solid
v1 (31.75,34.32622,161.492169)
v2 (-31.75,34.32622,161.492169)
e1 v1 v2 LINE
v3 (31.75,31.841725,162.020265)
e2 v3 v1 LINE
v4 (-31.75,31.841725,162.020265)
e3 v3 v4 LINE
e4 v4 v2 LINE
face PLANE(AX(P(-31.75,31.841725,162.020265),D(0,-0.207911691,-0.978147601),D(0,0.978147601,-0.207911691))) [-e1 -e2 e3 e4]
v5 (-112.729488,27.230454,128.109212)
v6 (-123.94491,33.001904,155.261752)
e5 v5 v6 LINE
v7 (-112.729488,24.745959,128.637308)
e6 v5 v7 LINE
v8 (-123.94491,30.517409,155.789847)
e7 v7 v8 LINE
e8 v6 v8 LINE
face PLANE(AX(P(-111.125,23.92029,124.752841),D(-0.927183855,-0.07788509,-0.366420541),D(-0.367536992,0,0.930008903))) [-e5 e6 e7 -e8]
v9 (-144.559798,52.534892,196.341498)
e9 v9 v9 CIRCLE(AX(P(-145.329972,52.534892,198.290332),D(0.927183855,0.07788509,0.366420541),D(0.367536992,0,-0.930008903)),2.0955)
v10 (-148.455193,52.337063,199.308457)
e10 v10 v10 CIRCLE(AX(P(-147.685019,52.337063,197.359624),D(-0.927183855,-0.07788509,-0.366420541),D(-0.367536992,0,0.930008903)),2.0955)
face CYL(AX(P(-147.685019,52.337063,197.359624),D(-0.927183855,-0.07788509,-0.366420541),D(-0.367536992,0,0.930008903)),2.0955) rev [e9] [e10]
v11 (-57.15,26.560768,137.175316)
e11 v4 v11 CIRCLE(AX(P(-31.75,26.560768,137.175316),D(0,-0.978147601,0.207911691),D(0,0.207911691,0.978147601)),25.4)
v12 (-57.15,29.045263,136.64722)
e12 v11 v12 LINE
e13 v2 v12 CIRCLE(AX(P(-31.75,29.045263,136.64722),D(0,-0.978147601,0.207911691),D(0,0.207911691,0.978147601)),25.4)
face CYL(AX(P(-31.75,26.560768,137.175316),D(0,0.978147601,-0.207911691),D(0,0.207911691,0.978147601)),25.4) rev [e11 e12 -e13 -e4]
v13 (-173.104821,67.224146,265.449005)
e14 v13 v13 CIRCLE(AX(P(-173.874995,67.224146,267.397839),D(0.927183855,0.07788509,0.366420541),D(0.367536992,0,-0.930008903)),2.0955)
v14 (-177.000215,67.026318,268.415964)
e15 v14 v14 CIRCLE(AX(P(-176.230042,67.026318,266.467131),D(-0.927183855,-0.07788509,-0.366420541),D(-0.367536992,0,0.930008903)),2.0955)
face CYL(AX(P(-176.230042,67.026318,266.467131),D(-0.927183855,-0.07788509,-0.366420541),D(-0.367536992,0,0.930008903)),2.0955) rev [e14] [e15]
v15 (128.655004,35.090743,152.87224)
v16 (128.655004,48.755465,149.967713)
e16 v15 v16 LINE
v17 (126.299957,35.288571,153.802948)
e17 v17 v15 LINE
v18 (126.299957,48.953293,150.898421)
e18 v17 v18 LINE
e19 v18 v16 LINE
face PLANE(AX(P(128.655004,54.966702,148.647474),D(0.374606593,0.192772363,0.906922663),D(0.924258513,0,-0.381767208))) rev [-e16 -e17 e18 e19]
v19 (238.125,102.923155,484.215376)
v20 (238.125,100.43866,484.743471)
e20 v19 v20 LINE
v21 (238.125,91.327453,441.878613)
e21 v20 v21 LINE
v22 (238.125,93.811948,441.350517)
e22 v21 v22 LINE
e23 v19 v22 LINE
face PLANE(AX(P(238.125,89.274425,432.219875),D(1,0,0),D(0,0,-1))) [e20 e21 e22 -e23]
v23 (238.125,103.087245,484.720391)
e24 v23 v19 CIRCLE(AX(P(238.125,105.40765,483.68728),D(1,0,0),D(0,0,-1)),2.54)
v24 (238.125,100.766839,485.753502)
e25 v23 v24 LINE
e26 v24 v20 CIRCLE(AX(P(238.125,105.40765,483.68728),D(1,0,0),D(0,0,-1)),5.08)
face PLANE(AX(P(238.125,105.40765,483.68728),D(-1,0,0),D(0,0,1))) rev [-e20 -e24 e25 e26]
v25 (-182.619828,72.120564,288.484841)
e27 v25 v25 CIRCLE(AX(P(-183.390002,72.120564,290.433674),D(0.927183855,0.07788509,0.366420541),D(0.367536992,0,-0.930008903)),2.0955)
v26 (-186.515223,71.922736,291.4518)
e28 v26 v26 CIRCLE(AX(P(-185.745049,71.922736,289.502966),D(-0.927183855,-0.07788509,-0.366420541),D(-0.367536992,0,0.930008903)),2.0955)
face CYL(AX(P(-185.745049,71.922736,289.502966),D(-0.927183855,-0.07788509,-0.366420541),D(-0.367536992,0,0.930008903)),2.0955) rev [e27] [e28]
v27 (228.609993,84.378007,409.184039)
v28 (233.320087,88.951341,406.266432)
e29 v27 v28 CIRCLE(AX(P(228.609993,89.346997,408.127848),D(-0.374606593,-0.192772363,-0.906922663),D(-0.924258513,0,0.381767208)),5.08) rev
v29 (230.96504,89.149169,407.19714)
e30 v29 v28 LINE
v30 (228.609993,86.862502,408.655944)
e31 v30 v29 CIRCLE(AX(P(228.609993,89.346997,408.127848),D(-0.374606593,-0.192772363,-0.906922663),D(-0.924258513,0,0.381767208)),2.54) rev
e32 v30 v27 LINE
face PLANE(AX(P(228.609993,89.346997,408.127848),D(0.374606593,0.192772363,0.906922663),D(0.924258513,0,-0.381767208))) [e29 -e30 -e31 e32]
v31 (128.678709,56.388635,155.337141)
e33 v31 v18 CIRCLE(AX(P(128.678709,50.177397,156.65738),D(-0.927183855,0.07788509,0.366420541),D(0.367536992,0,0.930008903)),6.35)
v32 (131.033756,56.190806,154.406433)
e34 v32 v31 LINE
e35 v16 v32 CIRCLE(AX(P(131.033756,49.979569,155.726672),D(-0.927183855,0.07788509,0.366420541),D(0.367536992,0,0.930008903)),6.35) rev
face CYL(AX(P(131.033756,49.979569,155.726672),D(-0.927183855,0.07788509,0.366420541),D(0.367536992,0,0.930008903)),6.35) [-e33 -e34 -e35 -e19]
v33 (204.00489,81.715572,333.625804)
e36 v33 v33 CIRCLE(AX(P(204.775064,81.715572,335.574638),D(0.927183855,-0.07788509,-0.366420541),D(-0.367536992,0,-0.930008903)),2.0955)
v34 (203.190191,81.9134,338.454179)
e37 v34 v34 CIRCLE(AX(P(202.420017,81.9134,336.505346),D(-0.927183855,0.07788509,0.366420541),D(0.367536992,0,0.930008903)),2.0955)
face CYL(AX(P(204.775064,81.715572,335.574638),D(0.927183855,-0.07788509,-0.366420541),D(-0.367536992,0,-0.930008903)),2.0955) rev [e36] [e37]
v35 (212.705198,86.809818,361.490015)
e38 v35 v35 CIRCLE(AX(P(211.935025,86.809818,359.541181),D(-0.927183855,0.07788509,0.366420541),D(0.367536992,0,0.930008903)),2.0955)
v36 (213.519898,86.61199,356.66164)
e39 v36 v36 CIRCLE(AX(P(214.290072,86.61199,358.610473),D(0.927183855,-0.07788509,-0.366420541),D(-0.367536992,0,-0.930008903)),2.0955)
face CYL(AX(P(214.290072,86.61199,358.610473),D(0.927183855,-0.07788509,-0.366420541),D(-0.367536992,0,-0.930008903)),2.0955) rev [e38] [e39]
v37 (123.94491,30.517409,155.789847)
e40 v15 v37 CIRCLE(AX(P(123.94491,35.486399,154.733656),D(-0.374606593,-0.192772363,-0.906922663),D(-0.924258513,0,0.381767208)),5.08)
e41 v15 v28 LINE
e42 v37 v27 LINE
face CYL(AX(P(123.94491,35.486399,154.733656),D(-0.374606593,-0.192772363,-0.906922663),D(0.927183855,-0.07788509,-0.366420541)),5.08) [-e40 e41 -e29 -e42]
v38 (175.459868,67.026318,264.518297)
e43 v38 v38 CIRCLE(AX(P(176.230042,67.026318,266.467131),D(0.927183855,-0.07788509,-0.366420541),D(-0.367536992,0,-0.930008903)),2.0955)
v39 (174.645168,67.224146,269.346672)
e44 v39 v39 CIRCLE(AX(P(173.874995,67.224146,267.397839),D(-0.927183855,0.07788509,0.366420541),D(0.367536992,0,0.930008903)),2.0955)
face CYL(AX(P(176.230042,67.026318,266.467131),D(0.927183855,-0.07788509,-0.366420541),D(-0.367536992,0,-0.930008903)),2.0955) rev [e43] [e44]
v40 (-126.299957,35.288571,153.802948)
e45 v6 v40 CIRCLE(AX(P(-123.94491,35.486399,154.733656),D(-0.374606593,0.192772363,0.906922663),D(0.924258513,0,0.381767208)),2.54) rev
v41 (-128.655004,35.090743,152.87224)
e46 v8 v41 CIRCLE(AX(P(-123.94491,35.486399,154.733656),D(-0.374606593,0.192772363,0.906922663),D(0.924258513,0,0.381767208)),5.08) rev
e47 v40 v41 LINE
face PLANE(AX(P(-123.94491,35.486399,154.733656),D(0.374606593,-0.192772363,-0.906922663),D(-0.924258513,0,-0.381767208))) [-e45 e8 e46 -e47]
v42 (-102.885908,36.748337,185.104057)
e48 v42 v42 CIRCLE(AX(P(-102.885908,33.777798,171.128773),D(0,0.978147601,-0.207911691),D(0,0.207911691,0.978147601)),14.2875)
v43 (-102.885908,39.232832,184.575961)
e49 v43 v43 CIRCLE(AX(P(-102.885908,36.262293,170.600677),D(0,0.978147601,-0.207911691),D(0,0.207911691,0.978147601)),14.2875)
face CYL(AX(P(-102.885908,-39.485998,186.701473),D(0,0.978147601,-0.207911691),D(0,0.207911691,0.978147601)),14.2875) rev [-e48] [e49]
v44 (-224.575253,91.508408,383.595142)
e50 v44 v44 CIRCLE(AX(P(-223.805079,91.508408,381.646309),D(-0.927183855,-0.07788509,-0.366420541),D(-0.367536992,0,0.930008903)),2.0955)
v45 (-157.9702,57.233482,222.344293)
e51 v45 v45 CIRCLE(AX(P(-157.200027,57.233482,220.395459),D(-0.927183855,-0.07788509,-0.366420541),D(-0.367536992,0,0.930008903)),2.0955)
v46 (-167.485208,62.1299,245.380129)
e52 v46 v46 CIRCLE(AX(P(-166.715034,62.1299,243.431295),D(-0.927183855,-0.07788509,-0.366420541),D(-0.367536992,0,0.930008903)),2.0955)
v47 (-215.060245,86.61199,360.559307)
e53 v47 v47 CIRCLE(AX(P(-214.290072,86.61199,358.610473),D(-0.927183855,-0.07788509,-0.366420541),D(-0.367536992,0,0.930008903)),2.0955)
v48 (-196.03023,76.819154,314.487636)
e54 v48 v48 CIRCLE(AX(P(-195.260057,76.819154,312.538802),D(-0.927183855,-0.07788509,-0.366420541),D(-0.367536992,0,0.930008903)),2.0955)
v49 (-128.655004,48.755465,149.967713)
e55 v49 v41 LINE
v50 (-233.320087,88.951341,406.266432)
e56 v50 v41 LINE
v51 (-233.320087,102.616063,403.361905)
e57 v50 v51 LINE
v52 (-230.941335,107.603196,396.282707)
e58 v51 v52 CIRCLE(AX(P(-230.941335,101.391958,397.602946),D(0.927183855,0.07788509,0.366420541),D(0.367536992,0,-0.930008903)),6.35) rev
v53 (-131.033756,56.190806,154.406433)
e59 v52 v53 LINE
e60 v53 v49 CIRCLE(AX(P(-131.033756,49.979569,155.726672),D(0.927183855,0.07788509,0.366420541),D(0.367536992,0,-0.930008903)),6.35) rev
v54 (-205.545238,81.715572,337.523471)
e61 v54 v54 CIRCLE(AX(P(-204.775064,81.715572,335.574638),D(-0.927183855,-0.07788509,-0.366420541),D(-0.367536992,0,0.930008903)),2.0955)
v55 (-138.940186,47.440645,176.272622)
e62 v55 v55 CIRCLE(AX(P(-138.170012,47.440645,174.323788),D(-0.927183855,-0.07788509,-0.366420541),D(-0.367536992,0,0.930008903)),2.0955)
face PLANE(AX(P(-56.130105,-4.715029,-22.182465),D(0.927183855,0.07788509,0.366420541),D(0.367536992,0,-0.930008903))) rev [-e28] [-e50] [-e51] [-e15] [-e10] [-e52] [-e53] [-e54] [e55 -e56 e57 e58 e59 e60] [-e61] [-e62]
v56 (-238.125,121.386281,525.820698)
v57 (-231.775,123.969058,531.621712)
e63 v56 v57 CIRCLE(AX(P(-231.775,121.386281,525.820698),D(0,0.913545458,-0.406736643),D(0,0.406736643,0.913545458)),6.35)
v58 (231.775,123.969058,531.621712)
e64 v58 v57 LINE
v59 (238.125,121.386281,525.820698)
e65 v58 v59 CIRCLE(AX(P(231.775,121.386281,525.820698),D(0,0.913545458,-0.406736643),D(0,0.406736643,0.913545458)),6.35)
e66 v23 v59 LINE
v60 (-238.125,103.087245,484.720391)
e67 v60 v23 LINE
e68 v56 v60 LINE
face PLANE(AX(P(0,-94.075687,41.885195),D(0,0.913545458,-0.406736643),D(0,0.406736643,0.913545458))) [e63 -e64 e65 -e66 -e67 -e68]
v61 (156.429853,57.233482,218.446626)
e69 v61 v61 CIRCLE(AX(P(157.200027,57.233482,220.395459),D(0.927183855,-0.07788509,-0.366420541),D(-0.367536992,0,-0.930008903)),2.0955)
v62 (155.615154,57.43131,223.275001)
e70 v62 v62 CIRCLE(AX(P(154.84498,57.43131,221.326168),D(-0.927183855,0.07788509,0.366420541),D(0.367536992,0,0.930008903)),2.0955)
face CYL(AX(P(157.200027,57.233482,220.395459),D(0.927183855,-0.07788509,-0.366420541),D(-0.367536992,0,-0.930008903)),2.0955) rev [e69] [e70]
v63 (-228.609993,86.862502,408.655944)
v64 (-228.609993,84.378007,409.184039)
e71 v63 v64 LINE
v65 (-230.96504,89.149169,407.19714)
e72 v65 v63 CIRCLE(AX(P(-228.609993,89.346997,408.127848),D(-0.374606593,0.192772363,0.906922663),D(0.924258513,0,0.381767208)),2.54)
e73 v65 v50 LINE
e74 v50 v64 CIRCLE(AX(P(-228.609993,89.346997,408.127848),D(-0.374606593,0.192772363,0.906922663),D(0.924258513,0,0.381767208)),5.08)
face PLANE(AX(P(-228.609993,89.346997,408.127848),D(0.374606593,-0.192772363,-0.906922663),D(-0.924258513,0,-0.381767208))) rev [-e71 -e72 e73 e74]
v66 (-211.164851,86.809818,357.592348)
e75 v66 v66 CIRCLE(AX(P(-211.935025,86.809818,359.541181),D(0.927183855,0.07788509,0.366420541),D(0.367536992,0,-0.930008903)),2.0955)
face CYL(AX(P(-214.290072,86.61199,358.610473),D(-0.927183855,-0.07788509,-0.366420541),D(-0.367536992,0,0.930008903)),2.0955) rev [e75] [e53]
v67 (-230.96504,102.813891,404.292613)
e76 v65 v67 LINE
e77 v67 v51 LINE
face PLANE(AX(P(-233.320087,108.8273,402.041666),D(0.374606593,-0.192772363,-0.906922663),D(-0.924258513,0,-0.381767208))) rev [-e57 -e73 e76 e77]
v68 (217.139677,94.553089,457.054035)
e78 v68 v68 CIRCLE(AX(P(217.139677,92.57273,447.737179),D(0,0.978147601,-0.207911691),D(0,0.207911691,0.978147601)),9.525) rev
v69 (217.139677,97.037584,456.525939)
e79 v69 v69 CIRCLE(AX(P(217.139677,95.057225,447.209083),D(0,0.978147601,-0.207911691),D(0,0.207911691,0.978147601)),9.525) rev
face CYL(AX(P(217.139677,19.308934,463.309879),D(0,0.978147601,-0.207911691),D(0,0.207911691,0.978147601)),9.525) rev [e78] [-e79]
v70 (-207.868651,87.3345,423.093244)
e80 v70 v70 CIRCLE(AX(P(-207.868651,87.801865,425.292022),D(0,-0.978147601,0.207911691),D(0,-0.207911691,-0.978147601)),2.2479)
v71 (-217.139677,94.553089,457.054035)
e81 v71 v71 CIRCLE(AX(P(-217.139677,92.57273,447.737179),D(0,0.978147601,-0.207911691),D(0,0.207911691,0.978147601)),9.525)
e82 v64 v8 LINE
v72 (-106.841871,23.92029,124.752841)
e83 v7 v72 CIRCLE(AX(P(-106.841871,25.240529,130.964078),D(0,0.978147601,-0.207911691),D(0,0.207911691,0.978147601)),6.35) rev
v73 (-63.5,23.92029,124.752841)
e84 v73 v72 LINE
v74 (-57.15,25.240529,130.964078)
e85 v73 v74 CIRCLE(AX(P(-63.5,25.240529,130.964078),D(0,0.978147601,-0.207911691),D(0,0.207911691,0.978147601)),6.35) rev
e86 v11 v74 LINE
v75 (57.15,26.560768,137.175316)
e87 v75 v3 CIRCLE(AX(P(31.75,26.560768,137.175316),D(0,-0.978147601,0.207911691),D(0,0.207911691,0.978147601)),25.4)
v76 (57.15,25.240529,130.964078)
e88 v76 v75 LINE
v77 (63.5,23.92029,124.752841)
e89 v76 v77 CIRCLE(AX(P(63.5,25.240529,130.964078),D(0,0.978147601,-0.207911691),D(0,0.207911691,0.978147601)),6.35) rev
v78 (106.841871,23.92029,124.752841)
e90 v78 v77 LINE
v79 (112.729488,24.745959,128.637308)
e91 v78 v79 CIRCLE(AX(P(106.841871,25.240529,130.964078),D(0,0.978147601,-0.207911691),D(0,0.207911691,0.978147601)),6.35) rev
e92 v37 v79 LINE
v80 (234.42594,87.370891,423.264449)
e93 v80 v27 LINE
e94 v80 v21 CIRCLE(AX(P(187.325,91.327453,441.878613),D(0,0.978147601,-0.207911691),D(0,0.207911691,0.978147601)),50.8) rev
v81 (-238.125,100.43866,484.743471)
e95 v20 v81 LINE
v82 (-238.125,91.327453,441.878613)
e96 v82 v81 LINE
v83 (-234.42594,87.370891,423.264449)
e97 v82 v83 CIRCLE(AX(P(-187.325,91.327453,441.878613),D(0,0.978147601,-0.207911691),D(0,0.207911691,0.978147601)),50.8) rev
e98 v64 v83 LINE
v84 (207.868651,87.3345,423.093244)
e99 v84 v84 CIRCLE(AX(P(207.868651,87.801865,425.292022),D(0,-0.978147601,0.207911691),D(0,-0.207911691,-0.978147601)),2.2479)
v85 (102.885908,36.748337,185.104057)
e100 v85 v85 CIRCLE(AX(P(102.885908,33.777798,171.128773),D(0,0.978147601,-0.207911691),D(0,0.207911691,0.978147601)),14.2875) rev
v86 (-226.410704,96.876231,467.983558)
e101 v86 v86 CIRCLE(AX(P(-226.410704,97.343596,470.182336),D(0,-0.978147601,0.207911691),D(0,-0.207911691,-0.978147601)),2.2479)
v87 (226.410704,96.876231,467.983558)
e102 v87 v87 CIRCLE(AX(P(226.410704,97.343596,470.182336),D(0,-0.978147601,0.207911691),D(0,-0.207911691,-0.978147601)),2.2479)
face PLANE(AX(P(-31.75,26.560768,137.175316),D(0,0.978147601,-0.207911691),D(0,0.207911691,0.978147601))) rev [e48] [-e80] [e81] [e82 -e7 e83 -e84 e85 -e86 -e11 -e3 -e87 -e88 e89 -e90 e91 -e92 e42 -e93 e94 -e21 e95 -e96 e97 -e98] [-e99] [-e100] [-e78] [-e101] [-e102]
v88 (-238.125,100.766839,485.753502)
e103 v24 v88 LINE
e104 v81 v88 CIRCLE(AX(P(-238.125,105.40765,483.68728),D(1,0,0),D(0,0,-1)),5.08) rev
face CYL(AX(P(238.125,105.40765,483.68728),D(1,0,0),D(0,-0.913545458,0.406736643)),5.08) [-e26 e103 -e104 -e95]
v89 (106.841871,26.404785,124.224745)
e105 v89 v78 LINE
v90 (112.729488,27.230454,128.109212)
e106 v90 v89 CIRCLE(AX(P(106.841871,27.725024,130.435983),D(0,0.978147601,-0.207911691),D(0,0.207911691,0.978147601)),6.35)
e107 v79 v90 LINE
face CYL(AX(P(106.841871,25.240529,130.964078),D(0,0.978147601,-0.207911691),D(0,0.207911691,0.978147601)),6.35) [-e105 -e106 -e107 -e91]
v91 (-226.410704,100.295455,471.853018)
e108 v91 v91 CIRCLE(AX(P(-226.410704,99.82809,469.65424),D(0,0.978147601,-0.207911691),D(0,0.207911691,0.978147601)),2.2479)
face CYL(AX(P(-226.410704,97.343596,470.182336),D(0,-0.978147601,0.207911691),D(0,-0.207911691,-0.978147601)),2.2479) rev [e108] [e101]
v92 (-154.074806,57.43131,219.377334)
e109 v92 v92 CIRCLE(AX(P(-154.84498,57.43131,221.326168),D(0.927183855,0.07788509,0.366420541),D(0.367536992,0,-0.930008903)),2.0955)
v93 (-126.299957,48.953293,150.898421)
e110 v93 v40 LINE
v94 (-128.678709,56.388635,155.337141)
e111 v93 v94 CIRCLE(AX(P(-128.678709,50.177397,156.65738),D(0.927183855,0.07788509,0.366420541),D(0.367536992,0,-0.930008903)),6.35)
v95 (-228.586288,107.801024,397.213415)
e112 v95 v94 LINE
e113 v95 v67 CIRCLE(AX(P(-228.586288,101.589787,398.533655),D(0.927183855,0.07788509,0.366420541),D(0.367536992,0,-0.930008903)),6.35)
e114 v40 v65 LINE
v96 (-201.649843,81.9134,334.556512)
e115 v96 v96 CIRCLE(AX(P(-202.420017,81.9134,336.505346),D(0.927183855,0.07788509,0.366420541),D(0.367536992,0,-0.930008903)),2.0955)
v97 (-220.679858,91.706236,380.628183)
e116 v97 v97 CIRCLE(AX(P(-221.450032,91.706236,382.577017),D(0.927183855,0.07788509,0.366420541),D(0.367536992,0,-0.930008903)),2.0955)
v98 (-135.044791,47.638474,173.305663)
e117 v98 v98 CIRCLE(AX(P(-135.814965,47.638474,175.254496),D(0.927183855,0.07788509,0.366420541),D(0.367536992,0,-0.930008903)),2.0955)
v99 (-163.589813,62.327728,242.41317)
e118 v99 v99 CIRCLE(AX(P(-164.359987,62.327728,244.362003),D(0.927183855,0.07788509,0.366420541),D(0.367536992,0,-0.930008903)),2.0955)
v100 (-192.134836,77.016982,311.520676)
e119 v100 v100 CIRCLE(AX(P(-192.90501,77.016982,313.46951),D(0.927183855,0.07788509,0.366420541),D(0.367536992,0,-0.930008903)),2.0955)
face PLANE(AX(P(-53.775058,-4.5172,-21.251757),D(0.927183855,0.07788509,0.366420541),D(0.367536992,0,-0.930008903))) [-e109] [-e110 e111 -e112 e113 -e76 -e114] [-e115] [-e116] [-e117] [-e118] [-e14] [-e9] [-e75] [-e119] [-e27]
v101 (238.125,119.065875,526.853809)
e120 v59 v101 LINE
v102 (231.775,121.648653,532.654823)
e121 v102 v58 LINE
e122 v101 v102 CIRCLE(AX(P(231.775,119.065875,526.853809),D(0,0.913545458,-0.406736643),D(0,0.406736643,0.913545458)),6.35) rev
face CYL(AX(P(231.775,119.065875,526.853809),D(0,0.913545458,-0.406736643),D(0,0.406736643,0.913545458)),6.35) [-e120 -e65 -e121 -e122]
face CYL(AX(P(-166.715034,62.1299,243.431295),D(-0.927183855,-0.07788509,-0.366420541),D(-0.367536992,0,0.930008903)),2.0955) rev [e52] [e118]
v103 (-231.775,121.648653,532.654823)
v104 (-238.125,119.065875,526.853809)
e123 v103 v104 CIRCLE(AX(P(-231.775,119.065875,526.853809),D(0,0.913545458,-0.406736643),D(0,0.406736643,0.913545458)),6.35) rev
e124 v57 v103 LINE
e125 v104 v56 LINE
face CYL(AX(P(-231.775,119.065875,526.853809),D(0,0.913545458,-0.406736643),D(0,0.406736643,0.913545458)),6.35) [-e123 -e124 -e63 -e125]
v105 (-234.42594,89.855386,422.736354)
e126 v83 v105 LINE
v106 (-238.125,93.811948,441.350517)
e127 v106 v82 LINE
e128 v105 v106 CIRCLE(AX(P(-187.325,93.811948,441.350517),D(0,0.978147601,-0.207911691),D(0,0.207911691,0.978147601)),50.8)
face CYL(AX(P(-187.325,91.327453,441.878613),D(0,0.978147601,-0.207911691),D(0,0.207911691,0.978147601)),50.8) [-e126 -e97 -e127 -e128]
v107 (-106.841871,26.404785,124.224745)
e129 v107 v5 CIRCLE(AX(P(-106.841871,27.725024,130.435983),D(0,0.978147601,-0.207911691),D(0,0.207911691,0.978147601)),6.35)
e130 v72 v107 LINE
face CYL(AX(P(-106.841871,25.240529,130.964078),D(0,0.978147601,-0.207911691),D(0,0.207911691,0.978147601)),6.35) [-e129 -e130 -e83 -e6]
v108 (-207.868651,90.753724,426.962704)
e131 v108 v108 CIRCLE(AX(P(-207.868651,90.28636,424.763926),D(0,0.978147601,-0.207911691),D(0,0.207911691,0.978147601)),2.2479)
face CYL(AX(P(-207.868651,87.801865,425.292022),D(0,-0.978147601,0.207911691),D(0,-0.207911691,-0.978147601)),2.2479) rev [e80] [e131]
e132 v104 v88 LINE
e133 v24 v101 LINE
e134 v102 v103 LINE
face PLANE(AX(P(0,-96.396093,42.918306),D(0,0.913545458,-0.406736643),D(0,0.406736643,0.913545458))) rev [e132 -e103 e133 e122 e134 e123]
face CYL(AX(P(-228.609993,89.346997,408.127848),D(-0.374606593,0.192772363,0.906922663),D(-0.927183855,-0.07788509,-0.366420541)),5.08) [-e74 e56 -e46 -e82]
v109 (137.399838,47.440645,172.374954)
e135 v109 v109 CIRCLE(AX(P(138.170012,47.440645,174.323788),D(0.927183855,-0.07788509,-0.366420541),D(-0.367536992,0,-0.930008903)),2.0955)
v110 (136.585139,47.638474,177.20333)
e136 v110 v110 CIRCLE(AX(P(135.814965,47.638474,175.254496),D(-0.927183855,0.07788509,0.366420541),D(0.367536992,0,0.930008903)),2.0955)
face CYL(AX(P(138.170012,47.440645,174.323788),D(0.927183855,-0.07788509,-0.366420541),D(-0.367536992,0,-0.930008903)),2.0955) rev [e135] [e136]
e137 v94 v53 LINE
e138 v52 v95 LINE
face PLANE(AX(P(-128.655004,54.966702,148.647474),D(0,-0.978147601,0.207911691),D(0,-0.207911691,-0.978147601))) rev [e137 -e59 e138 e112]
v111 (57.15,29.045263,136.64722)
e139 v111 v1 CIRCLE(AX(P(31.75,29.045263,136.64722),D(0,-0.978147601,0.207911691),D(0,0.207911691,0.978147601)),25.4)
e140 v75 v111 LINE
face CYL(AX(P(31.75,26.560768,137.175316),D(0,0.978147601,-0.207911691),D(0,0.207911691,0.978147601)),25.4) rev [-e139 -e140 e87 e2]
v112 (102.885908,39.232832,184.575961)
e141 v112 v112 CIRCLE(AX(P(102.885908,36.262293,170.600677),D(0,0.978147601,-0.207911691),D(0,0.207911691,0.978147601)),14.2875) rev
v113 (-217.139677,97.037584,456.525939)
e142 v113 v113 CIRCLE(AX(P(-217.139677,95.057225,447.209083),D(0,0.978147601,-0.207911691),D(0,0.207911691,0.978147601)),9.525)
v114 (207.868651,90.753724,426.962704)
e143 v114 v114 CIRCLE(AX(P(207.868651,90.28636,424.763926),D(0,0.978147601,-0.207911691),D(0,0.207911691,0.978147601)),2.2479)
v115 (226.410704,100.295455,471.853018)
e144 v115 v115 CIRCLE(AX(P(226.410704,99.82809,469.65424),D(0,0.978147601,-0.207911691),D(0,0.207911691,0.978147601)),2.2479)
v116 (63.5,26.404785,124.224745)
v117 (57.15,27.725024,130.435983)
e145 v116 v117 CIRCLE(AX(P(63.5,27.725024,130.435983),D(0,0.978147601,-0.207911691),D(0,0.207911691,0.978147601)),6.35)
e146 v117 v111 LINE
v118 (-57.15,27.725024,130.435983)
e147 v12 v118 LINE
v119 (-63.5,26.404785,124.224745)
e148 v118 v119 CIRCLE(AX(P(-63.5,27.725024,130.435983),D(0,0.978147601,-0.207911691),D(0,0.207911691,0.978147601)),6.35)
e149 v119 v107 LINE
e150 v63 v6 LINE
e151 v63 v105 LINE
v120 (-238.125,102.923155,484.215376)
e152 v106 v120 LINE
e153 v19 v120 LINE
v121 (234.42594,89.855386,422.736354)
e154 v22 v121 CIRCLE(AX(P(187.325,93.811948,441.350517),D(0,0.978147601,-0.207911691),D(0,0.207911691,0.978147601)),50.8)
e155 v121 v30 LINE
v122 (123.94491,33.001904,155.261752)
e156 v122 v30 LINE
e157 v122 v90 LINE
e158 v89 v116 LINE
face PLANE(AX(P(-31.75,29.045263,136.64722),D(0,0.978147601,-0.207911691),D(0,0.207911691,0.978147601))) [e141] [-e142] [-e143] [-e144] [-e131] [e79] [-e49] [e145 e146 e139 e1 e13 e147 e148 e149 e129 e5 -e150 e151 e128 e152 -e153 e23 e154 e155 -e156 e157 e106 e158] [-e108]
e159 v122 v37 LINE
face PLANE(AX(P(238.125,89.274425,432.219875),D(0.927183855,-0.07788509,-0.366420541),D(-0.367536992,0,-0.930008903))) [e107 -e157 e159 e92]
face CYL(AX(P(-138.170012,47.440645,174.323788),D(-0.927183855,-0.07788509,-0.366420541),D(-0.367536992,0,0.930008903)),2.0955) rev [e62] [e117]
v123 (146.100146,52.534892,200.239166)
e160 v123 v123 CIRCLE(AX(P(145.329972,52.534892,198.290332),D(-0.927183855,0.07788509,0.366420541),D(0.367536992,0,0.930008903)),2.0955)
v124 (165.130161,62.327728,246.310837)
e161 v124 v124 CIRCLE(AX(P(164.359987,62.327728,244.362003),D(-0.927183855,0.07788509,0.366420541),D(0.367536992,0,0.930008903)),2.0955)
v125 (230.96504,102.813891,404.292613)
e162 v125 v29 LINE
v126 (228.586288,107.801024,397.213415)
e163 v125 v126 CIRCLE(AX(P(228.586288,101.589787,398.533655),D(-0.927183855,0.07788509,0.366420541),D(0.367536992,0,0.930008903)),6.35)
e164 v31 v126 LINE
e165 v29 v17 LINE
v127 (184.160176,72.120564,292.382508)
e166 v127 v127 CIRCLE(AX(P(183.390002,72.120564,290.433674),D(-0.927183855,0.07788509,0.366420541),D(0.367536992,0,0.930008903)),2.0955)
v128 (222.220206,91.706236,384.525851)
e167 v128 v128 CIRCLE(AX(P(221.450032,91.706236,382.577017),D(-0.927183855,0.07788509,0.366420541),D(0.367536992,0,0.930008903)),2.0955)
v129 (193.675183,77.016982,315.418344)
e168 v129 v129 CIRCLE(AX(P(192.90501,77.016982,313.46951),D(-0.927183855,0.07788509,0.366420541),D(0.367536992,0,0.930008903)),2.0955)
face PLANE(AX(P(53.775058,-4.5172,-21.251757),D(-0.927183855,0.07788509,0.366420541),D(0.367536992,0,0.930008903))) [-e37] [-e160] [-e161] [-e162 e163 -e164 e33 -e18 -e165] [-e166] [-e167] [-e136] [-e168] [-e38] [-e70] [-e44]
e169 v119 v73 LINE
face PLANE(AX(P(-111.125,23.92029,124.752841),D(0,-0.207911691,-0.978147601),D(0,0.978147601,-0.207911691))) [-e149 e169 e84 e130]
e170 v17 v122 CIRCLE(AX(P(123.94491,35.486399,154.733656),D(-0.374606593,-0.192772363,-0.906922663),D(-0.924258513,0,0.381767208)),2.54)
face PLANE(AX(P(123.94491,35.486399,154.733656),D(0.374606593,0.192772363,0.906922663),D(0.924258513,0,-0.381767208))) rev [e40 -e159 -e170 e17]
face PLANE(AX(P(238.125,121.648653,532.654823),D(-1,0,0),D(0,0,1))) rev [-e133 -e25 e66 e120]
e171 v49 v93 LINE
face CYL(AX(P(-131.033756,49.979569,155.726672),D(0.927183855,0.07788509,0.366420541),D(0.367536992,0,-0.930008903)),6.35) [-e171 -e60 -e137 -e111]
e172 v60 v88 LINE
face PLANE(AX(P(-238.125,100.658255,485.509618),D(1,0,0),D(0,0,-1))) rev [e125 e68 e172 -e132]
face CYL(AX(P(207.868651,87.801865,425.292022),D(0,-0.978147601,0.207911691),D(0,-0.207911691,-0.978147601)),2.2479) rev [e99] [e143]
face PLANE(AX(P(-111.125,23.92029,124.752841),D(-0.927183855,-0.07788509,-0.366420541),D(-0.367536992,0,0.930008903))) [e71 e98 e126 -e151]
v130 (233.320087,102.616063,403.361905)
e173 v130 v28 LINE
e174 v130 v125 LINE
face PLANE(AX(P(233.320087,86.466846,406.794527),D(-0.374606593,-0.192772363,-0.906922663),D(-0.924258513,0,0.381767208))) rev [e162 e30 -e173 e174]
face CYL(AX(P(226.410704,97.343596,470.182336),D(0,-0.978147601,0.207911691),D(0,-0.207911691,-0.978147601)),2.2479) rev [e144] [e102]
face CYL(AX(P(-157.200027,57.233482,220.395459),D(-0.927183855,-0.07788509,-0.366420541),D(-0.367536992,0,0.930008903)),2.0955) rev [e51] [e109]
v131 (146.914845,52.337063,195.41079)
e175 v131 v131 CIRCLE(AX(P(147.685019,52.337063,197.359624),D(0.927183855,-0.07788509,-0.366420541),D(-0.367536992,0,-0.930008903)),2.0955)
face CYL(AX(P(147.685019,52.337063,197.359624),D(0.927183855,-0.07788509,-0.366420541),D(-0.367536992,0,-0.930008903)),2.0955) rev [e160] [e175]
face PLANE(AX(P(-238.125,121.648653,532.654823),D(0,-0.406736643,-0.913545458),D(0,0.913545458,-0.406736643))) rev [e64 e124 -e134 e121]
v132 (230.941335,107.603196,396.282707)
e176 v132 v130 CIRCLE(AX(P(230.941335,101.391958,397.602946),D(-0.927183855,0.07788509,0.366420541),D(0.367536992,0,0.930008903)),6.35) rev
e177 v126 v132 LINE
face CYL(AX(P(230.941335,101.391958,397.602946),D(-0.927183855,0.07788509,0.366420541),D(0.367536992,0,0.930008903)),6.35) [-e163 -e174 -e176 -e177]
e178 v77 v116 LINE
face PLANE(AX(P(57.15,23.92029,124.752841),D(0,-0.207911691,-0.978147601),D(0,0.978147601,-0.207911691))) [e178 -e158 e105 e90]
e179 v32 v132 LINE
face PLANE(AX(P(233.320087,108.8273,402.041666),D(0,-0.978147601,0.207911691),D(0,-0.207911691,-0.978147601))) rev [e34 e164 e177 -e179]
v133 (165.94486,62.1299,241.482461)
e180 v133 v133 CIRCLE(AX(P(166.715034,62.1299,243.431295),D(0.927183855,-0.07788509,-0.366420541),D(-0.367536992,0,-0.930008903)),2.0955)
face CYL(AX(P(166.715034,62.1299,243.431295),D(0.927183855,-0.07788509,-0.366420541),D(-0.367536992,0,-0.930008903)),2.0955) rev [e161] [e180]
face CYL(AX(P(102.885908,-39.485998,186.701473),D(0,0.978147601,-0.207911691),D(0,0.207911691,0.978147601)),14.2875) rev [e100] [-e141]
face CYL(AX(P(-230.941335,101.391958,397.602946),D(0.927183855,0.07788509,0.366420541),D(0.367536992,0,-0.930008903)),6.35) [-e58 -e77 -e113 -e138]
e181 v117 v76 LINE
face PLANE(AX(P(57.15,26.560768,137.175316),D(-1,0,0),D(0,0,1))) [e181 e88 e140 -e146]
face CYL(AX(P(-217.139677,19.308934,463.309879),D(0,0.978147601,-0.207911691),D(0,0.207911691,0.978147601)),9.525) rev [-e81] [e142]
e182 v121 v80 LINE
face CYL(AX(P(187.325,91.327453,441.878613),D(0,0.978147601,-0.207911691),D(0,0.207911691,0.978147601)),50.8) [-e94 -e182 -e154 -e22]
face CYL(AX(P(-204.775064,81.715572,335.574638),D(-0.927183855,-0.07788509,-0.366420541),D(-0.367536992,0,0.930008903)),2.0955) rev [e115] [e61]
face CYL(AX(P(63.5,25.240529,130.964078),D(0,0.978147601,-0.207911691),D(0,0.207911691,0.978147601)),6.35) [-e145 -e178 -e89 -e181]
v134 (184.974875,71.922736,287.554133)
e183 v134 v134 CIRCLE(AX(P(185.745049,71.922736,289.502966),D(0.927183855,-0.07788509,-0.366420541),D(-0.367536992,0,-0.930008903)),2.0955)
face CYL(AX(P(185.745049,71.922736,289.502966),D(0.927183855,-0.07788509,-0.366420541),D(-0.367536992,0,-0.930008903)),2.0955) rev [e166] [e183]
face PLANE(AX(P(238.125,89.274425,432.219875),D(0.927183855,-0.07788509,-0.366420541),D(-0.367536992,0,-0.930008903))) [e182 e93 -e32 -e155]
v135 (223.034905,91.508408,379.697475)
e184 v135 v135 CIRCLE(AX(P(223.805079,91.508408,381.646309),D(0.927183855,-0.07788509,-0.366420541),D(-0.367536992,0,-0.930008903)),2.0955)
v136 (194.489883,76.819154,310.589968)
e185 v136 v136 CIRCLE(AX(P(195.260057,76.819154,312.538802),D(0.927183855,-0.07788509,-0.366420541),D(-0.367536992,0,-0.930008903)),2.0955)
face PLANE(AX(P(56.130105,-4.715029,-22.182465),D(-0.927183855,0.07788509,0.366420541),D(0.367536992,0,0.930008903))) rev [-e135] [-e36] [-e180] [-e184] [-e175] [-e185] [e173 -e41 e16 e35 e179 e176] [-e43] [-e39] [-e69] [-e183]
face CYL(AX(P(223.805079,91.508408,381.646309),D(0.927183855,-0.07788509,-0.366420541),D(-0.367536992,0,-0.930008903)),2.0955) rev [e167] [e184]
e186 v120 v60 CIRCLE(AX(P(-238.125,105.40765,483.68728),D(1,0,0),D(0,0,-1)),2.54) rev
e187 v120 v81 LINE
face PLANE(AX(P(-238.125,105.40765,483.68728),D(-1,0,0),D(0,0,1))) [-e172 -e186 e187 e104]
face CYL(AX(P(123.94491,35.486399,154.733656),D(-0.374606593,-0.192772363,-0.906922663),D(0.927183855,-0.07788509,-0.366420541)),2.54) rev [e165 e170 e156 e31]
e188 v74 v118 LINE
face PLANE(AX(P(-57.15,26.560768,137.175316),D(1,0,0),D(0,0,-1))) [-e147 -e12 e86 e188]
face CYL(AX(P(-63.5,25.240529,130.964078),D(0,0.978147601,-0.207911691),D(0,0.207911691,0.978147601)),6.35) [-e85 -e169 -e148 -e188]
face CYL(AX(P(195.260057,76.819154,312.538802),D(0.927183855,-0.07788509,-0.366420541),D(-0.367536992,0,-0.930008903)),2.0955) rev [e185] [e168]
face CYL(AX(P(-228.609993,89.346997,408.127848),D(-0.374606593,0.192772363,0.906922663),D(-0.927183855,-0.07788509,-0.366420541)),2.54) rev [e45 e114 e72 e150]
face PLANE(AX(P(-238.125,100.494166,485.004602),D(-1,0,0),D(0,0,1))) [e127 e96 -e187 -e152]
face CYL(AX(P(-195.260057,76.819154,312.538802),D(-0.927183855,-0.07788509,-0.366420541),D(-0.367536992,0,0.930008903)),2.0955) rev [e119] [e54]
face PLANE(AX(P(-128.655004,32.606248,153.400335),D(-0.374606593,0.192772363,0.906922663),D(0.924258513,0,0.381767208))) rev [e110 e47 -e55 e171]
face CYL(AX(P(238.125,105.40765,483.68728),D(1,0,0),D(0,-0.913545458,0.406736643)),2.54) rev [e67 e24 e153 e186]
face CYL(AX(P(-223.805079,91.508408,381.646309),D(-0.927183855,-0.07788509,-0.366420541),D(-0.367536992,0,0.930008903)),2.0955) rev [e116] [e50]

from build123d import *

# Parameters (mm, degrees)
BASE_FLANGE1_DEPTH               = 2.54
EDGE_FLANGE1_DEPTH               = 279.4
EDGE_FLANGE1_BEND_DEPTH          = 279.4
SKETCH12_R                       = 9.525
SKETCH12_R_2                     = 14.2875
CUT_EXTRUDE2_DEPTH               = 552.198202569
EDGE_FLANGE3_STRIP_CUT_DEPTH     = 476.25
EDGE_FLANGE3_DEPTH               = 476.25
F_1_4_0_25_DIAMETER_HOLE1_REACH  = 643.085
F_1_4_0_25_DIAMETER_HOLE1_BORE_R = 2.0955
F_8_CLEARANCE_HOLE1_D            = 4.4958
FILLET1_R                        = 50.8
FILLET2_R                        = 6.35


# Sheet-metal steps are written as plain solids
with BuildPart() as part:
    # Sketch19 → Base-Flange1 (new body)
    with BuildSketch(Plane(origin=(0, 0, 0), x_dir=(1, 0, 0), z_dir=(0, 0.9781476007338071, -0.20791169081775282))):
        with BuildLine():
            Line((238.125, -441.336030384), (111.125, -127))
            Line((111.125, -127), (57.15, -127))
            Line((57.15, -127), (57.15, -139.7))
            ThreePointArc((57.15, -139.7), (49.710512242, -157.660512242), (31.75, -165.1))
            Line((31.75, -165.1), (-31.75, -165.1))
            ThreePointArc((-31.75, -165.1), (-49.710512242, -157.660512242), (-57.15, -139.7))
            Line((-57.15, -139.7), (-57.15, -127))
            Line((-57.15, -127), (-111.125, -127))
            Line((-111.125, -127), (-238.125, -441.336030384))
            Line((-238.125, -441.336030384), (-238.125, -495.3))
            Line((-238.125, -495.3), (238.125, -495.3))
            Line((238.125, -495.3), (238.125, -441.336030384))
        make_face()
    extrude(amount=-BASE_FLANGE1_DEPTH)

    # Edge-Flange1 section (across the edge) → Edge-Flange1 (add)
    with BuildSketch(Plane(origin=(-126.299957317, 32.804075954, 154.331043448), x_dir=(0.9271838545667858, 0.07788509022858499, 0.36642054056884243), z_dir=(-0.3746065934159162, 0.19277236290190183, 0.9069226627836245))):
        with BuildLine():
            Line((-2.54, 2.54), (-2.54, 22.86))
            Line((-2.54, 22.86), (0, 22.86))
            Line((0, 22.86), (0, 2.54))
            ThreePointArc((0, 2.54), (0.743948776, 0.743948776), (2.54, 0))
            Line((2.54, 0), (2.54, -2.54))
            ThreePointArc((2.54, -2.54), (-1.052102448, -1.052102448), (-2.54, 2.54))
        make_face()
    extrude(amount=EDGE_FLANGE1_DEPTH)

    # Edge-Flange1 section 2 (across the edge) → Edge-Flange1 bend (add)
    with BuildSketch(Plane(origin=(230.965039518, 86.664674149, 407.72523543), x_dir=(-0.9271838545667858, 0.07788509022858499, 0.36642054056884243), z_dir=(-0.3746065934159162, -0.19277236290190183, -0.9069226627836245))):
        with BuildLine():
            Line((-2.54, 2.54), (-2.54, 22.86))
            Line((-2.54, 22.86), (0, 22.86))
            Line((0, 22.86), (0, 2.54))
            ThreePointArc((0, 2.54), (0.743948776, 0.743948776), (2.54, 0))
            Line((2.54, 0), (2.54, -2.54))
            ThreePointArc((2.54, -2.54), (-1.052102448, -1.052102448), (-2.54, 2.54))
        make_face()
    extrude(amount=EDGE_FLANGE1_BEND_DEPTH)

    # Sketch12 → Cut-Extrude2 (cut, symmetric)
    with BuildSketch(Plane(origin=(0, 0, 0), x_dir=(1, 0, 0), z_dir=(0, 0.9781476007338071, -0.20791169081775282))):
        with Locations(Location((-217.139677307, -457.2, 0), (0, 0, 270))):
            Circle(SKETCH12_R)
        with Locations(Location((-102.885908047, -174.411997752, 0), (0, 0, 270))):
            Circle(SKETCH12_R_2)
    cut_extrude2 = extrude(amount=CUT_EXTRUDE2_DEPTH, both=True, mode=Mode.SUBTRACT)

    # Mirror8: Cut-Extrude2 across plane
    add(cut_extrude2.mirror(Plane(origin=(0, 0, 0), x_dir=(0, 0, 1), z_dir=(1, 0, 0))), mode=Mode.SUBTRACT)

    # Edge-Flange3 strip (across the edge) → Edge-Flange3 strip cut (cut)
    with BuildSketch(Plane(origin=(-238.125, 102.978660462, 484.476506643), x_dir=(0, 0.9135454576426064, -0.40673664307578805), z_dir=(1, 0, 0))):
        Polygon((-5.59756398, 14.117742803), (-2.428989812, -0.789226632), (0.055505094, -0.261130937), (-3.113069074, 14.645838498), align=None)
    extrude(amount=EDGE_FLANGE3_STRIP_CUT_DEPTH, mode=Mode.SUBTRACT)

    # Edge-Flange3 section (across the edge) → Edge-Flange3 (add)
    with BuildSketch(Plane(origin=(-238.125, 102.978660462, 484.476506643), x_dir=(0, 0.9135454576426064, -0.40673664307578805), z_dir=(1, 0, 0))):
        with BuildLine():
            Line((-2.54, 0.266964758), (-2.54, 51.606851994))
            Line((-2.54, 51.606851994), (0, 51.606851994))
            Line((0, 51.606851994), (0, 0.266964758))
            ThreePointArc((0, 0.266964758), (0.013914386, 0.001462461), (0.055505094, -0.261130937))
            Line((0.055505094, -0.261130937), (-2.428989812, -0.789226632))
            ThreePointArc((-2.428989812, -0.789226632), (-2.512171228, -0.264039836), (-2.54, 0.266964758))
        make_face()
    extrude(amount=EDGE_FLANGE3_DEPTH)

    # 1/4 (0.25) Diameter Hole1 bore → 1/4 (0.25) Diameter Hole1 (cut, up to next)
    with BuildSketch(Plane(origin=(56.130105113, -4.715028502, -22.18246506), x_dir=(-0.36522461184560684, 0.02959733478276131, -0.9304488060479109), z_dir=(0.9271838545667707, -0.07788509022859282, -0.36642054056887907)), mode=Mode.PRIVATE) as f_1_4_0_25_diameter_hole1_sk1:
        with Locations((-211.258332787, 58.612157306)):
            Circle(F_1_4_0_25_DIAMETER_HOLE1_BORE_R)
    f_1_4_0_25_diameter_hole1_tool1 = extrude(f_1_4_0_25_diameter_hole1_sk1.sketch, amount=-F_1_4_0_25_DIAMETER_HOLE1_REACH, mode=Mode.PRIVATE) & part.part
    # 1/4 (0.25) Diameter Hole1 bore → 1/4 (0.25) Diameter Hole1 (cut, up to next)
    with BuildSketch(Plane(origin=(56.130105113, -4.715028502, -22.18246506), x_dir=(-0.36522461184560684, 0.02959733478276131, -0.9304488060479109), z_dir=(0.9271838545667707, -0.07788509022859282, -0.36642054056887907)), mode=Mode.PRIVATE) as f_1_4_0_25_diameter_hole1_sk2:
        with Locations((-236.022192538, 64.261161667)):
            Circle(F_1_4_0_25_DIAMETER_HOLE1_BORE_R)
    f_1_4_0_25_diameter_hole1_tool2 = extrude(f_1_4_0_25_diameter_hole1_sk2.sketch, amount=-F_1_4_0_25_DIAMETER_HOLE1_REACH, mode=Mode.PRIVATE) & part.part
    # 1/4 (0.25) Diameter Hole1 bore → 1/4 (0.25) Diameter Hole1 (cut, up to next)
    with BuildSketch(Plane(origin=(56.130105113, -4.715028502, -22.18246506), x_dir=(-0.36522461184560684, 0.02959733478276131, -0.9304488060479109), z_dir=(0.9271838545667707, -0.07788509022859282, -0.36642054056887907)), mode=Mode.PRIVATE) as f_1_4_0_25_diameter_hole1_sk3:
        with Locations((-260.786052288, 69.910166028)):
            Circle(F_1_4_0_25_DIAMETER_HOLE1_BORE_R)
    f_1_4_0_25_diameter_hole1_tool3 = extrude(f_1_4_0_25_diameter_hole1_sk3.sketch, amount=-F_1_4_0_25_DIAMETER_HOLE1_REACH, mode=Mode.PRIVATE) & part.part
    # 1/4 (0.25) Diameter Hole1 bore → 1/4 (0.25) Diameter Hole1 (cut, up to next)
    with BuildSketch(Plane(origin=(56.130105113, -4.715028502, -22.18246506), x_dir=(-0.36522461184560684, 0.02959733478276131, -0.9304488060479109), z_dir=(0.9271838545667707, -0.07788509022859282, -0.36642054056887907)), mode=Mode.PRIVATE) as f_1_4_0_25_diameter_hole1_sk4:
        with Locations((-285.549912038, 75.559170388)):
            Circle(F_1_4_0_25_DIAMETER_HOLE1_BORE_R)
    f_1_4_0_25_diameter_hole1_tool4 = extrude(f_1_4_0_25_diameter_hole1_sk4.sketch, amount=-F_1_4_0_25_DIAMETER_HOLE1_REACH, mode=Mode.PRIVATE) & part.part
    # 1/4 (0.25) Diameter Hole1 bore → 1/4 (0.25) Diameter Hole1 (cut, up to next)
    with BuildSketch(Plane(origin=(56.130105113, -4.715028502, -22.18246506), x_dir=(-0.36522461184560684, 0.02959733478276131, -0.9304488060479109), z_dir=(0.9271838545667707, -0.07788509022859282, -0.36642054056887907)), mode=Mode.PRIVATE) as f_1_4_0_25_diameter_hole1_sk5:
        with Locations((-310.313771788, 81.208174749)):
            Circle(F_1_4_0_25_DIAMETER_HOLE1_BORE_R)
    f_1_4_0_25_diameter_hole1_tool5 = extrude(f_1_4_0_25_diameter_hole1_sk5.sketch, amount=-F_1_4_0_25_DIAMETER_HOLE1_REACH, mode=Mode.PRIVATE) & part.part
    # 1/4 (0.25) Diameter Hole1 bore → 1/4 (0.25) Diameter Hole1 (cut, up to next)
    with BuildSketch(Plane(origin=(56.130105113, -4.715028502, -22.18246506), x_dir=(-0.36522461184560684, 0.02959733478276131, -0.9304488060479109), z_dir=(0.9271838545667707, -0.07788509022859282, -0.36642054056887907)), mode=Mode.PRIVATE) as f_1_4_0_25_diameter_hole1_sk6:
        with Locations((-335.077631539, 86.85717911)):
            Circle(F_1_4_0_25_DIAMETER_HOLE1_BORE_R)
    f_1_4_0_25_diameter_hole1_tool6 = extrude(f_1_4_0_25_diameter_hole1_sk6.sketch, amount=-F_1_4_0_25_DIAMETER_HOLE1_REACH, mode=Mode.PRIVATE) & part.part
    # 1/4 (0.25) Diameter Hole1 bore → 1/4 (0.25) Diameter Hole1 (cut, up to next)
    with BuildSketch(Plane(origin=(56.130105113, -4.715028502, -22.18246506), x_dir=(-0.36522461184560684, 0.02959733478276131, -0.9304488060479109), z_dir=(0.9271838545667707, -0.07788509022859282, -0.36642054056887907)), mode=Mode.PRIVATE) as f_1_4_0_25_diameter_hole1_sk7:
        with Locations((-359.841491289, 92.506183471)):
            Circle(F_1_4_0_25_DIAMETER_HOLE1_BORE_R)
    f_1_4_0_25_diameter_hole1_tool7 = extrude(f_1_4_0_25_diameter_hole1_sk7.sketch, amount=-F_1_4_0_25_DIAMETER_HOLE1_REACH, mode=Mode.PRIVATE) & part.part
    # 1/4 (0.25) Diameter Hole1 bore → 1/4 (0.25) Diameter Hole1 (cut, up to next)
    with BuildSketch(Plane(origin=(56.130105113, -4.715028502, -22.18246506), x_dir=(-0.36522461184560684, 0.02959733478276131, -0.9304488060479109), z_dir=(0.9271838545667707, -0.07788509022859282, -0.36642054056887907)), mode=Mode.PRIVATE) as f_1_4_0_25_diameter_hole1_sk8:
        with Locations((-384.605351039, 98.155187832)):
            Circle(F_1_4_0_25_DIAMETER_HOLE1_BORE_R)
    f_1_4_0_25_diameter_hole1_tool8 = extrude(f_1_4_0_25_diameter_hole1_sk8.sketch, amount=-F_1_4_0_25_DIAMETER_HOLE1_REACH, mode=Mode.PRIVATE) & part.part
    # 1/4 (0.25) Diameter Hole1 bore → 1/4 (0.25) Diameter Hole1 (cut, up to next)
    with BuildSketch(Plane(origin=(56.130105113, -4.715028502, -22.18246506), x_dir=(-0.36522461184560684, 0.02959733478276131, -0.9304488060479109), z_dir=(0.9271838545667707, -0.07788509022859282, -0.36642054056887907)), mode=Mode.PRIVATE) as f_1_4_0_25_diameter_hole1_sk9:
        with Locations((-409.369210789, 103.804192193)):
            Circle(F_1_4_0_25_DIAMETER_HOLE1_BORE_R)
    f_1_4_0_25_diameter_hole1_tool9 = extrude(f_1_4_0_25_diameter_hole1_sk9.sketch, amount=-F_1_4_0_25_DIAMETER_HOLE1_REACH, mode=Mode.PRIVATE) & part.part
    # 1/4 (0.25) Diameter Hole1 bore → 1/4 (0.25) Diameter Hole1 (cut, up to next)
    with BuildSketch(Plane(origin=(56.130105113, -4.715028502, -22.18246506), x_dir=(-0.36522461184560684, 0.02959733478276131, -0.9304488060479109), z_dir=(0.9271838545667707, -0.07788509022859282, -0.36642054056887907)), mode=Mode.PRIVATE) as f_1_4_0_25_diameter_hole1_sk10:
        with Locations((-434.13307054, 109.453196554)):
            Circle(F_1_4_0_25_DIAMETER_HOLE1_BORE_R)
    f_1_4_0_25_diameter_hole1_tool10 = extrude(f_1_4_0_25_diameter_hole1_sk10.sketch, amount=-F_1_4_0_25_DIAMETER_HOLE1_REACH, mode=Mode.PRIVATE) & part.part
    f_1_4_0_25_diameter_hole1_1 = f_1_4_0_25_diameter_hole1_tool1.solids().sort_by_distance((138.170012, 47.440645, 174.323788))[0]
    add(f_1_4_0_25_diameter_hole1_1, mode=Mode.SUBTRACT)
    f_1_4_0_25_diameter_hole1_2 = f_1_4_0_25_diameter_hole1_tool2.solids().sort_by_distance((147.685019, 52.337063, 197.359624))[0]
    add(f_1_4_0_25_diameter_hole1_2, mode=Mode.SUBTRACT)
    f_1_4_0_25_diameter_hole1_3 = f_1_4_0_25_diameter_hole1_tool3.solids().sort_by_distance((157.200027, 57.233482, 220.395459))[0]
    add(f_1_4_0_25_diameter_hole1_3, mode=Mode.SUBTRACT)
    f_1_4_0_25_diameter_hole1_4 = f_1_4_0_25_diameter_hole1_tool4.solids().sort_by_distance((166.715034, 62.1299, 243.431295))[0]
    add(f_1_4_0_25_diameter_hole1_4, mode=Mode.SUBTRACT)
    f_1_4_0_25_diameter_hole1_5 = f_1_4_0_25_diameter_hole1_tool5.solids().sort_by_distance((176.230042, 67.026318, 266.467131))[0]
    add(f_1_4_0_25_diameter_hole1_5, mode=Mode.SUBTRACT)
    f_1_4_0_25_diameter_hole1_6 = f_1_4_0_25_diameter_hole1_tool6.solids().sort_by_distance((185.745049, 71.922736, 289.502966))[0]
    add(f_1_4_0_25_diameter_hole1_6, mode=Mode.SUBTRACT)
    f_1_4_0_25_diameter_hole1_7 = f_1_4_0_25_diameter_hole1_tool7.solids().sort_by_distance((195.260057, 76.819154, 312.538802))[0]
    add(f_1_4_0_25_diameter_hole1_7, mode=Mode.SUBTRACT)
    f_1_4_0_25_diameter_hole1_8 = f_1_4_0_25_diameter_hole1_tool8.solids().sort_by_distance((204.775064, 81.715572, 335.574638))[0]
    add(f_1_4_0_25_diameter_hole1_8, mode=Mode.SUBTRACT)
    f_1_4_0_25_diameter_hole1_9 = f_1_4_0_25_diameter_hole1_tool9.solids().sort_by_distance((214.290072, 86.61199, 358.610473))[0]
    add(f_1_4_0_25_diameter_hole1_9, mode=Mode.SUBTRACT)
    f_1_4_0_25_diameter_hole1_10 = f_1_4_0_25_diameter_hole1_tool10.solids().sort_by_distance((223.805079, 91.508408, 381.646309))[0]
    add(f_1_4_0_25_diameter_hole1_10, mode=Mode.SUBTRACT)
    f_1_4_0_25_diameter_hole1 = f_1_4_0_25_diameter_hole1_1 + f_1_4_0_25_diameter_hole1_2 + f_1_4_0_25_diameter_hole1_3 + f_1_4_0_25_diameter_hole1_4 + f_1_4_0_25_diameter_hole1_5 + f_1_4_0_25_diameter_hole1_6 + f_1_4_0_25_diameter_hole1_7 + f_1_4_0_25_diameter_hole1_8 + f_1_4_0_25_diameter_hole1_9 + f_1_4_0_25_diameter_hole1_10  # 1/4 (0.25) Diameter Hole1 as one shape, for the pattern or mirror that repeats it

    # Mirror9: 1/4 (0.25) Diameter Hole1 across plane
    add(f_1_4_0_25_diameter_hole1.mirror(Plane(origin=(0, 0, 0), x_dir=(0, 0, 1), z_dir=(1, 0, 0))), mode=Mode.SUBTRACT)

    # #8 Clearance Hole1 (through all)
    with Locations(Plane(origin=(0, -2.484494906, 0.528095695), x_dir=(-1, 0, 0), z_dir=(0, -0.9781476007338071, 0.20791169081775288))):
        with Locations((-226.410703505, -480.146595062), (-207.868651108, -434.253404938), (207.868651108, -434.253404938), (226.410703505, -480.146595062)):
            Hole(F_8_CLEARANCE_HOLE1_D / 2)

    # Fillet1
    fillet1_edges = [part.edges().sort_by_distance(p)[0] for p in [
        (238.125, 90.516672843, 431.955827085),
        (-238.125, 90.516672843, 431.955827085),
    ]]
    fillet(fillet1_edges, radius=FILLET1_R)

    # Fillet2
    fillet2_edges = [part.edges().sort_by_distance(p)[0] for p in [
        (-238.125, 122.80885547, 532.138267402),
        (238.125, 122.80885547, 532.138267402),
        (111.125, 25.162537281, 124.488793141),
        (-111.125, 25.162537281, 124.488793141),
        (-57.15, 25.162537281, 124.488793141),
        (57.15, 25.162537281, 124.488793141),
        (-127.477480813, 55.065616042, 149.112828109),
        (-232.142563013, 108.926214237, 402.507020091),
        (232.142563013, 108.926214237, 402.507020091),
        (127.477480813, 55.065616042, 149.112828109),
    ]]
    fillet(fillet2_edges, radius=FILLET2_R)


solid = part.part
